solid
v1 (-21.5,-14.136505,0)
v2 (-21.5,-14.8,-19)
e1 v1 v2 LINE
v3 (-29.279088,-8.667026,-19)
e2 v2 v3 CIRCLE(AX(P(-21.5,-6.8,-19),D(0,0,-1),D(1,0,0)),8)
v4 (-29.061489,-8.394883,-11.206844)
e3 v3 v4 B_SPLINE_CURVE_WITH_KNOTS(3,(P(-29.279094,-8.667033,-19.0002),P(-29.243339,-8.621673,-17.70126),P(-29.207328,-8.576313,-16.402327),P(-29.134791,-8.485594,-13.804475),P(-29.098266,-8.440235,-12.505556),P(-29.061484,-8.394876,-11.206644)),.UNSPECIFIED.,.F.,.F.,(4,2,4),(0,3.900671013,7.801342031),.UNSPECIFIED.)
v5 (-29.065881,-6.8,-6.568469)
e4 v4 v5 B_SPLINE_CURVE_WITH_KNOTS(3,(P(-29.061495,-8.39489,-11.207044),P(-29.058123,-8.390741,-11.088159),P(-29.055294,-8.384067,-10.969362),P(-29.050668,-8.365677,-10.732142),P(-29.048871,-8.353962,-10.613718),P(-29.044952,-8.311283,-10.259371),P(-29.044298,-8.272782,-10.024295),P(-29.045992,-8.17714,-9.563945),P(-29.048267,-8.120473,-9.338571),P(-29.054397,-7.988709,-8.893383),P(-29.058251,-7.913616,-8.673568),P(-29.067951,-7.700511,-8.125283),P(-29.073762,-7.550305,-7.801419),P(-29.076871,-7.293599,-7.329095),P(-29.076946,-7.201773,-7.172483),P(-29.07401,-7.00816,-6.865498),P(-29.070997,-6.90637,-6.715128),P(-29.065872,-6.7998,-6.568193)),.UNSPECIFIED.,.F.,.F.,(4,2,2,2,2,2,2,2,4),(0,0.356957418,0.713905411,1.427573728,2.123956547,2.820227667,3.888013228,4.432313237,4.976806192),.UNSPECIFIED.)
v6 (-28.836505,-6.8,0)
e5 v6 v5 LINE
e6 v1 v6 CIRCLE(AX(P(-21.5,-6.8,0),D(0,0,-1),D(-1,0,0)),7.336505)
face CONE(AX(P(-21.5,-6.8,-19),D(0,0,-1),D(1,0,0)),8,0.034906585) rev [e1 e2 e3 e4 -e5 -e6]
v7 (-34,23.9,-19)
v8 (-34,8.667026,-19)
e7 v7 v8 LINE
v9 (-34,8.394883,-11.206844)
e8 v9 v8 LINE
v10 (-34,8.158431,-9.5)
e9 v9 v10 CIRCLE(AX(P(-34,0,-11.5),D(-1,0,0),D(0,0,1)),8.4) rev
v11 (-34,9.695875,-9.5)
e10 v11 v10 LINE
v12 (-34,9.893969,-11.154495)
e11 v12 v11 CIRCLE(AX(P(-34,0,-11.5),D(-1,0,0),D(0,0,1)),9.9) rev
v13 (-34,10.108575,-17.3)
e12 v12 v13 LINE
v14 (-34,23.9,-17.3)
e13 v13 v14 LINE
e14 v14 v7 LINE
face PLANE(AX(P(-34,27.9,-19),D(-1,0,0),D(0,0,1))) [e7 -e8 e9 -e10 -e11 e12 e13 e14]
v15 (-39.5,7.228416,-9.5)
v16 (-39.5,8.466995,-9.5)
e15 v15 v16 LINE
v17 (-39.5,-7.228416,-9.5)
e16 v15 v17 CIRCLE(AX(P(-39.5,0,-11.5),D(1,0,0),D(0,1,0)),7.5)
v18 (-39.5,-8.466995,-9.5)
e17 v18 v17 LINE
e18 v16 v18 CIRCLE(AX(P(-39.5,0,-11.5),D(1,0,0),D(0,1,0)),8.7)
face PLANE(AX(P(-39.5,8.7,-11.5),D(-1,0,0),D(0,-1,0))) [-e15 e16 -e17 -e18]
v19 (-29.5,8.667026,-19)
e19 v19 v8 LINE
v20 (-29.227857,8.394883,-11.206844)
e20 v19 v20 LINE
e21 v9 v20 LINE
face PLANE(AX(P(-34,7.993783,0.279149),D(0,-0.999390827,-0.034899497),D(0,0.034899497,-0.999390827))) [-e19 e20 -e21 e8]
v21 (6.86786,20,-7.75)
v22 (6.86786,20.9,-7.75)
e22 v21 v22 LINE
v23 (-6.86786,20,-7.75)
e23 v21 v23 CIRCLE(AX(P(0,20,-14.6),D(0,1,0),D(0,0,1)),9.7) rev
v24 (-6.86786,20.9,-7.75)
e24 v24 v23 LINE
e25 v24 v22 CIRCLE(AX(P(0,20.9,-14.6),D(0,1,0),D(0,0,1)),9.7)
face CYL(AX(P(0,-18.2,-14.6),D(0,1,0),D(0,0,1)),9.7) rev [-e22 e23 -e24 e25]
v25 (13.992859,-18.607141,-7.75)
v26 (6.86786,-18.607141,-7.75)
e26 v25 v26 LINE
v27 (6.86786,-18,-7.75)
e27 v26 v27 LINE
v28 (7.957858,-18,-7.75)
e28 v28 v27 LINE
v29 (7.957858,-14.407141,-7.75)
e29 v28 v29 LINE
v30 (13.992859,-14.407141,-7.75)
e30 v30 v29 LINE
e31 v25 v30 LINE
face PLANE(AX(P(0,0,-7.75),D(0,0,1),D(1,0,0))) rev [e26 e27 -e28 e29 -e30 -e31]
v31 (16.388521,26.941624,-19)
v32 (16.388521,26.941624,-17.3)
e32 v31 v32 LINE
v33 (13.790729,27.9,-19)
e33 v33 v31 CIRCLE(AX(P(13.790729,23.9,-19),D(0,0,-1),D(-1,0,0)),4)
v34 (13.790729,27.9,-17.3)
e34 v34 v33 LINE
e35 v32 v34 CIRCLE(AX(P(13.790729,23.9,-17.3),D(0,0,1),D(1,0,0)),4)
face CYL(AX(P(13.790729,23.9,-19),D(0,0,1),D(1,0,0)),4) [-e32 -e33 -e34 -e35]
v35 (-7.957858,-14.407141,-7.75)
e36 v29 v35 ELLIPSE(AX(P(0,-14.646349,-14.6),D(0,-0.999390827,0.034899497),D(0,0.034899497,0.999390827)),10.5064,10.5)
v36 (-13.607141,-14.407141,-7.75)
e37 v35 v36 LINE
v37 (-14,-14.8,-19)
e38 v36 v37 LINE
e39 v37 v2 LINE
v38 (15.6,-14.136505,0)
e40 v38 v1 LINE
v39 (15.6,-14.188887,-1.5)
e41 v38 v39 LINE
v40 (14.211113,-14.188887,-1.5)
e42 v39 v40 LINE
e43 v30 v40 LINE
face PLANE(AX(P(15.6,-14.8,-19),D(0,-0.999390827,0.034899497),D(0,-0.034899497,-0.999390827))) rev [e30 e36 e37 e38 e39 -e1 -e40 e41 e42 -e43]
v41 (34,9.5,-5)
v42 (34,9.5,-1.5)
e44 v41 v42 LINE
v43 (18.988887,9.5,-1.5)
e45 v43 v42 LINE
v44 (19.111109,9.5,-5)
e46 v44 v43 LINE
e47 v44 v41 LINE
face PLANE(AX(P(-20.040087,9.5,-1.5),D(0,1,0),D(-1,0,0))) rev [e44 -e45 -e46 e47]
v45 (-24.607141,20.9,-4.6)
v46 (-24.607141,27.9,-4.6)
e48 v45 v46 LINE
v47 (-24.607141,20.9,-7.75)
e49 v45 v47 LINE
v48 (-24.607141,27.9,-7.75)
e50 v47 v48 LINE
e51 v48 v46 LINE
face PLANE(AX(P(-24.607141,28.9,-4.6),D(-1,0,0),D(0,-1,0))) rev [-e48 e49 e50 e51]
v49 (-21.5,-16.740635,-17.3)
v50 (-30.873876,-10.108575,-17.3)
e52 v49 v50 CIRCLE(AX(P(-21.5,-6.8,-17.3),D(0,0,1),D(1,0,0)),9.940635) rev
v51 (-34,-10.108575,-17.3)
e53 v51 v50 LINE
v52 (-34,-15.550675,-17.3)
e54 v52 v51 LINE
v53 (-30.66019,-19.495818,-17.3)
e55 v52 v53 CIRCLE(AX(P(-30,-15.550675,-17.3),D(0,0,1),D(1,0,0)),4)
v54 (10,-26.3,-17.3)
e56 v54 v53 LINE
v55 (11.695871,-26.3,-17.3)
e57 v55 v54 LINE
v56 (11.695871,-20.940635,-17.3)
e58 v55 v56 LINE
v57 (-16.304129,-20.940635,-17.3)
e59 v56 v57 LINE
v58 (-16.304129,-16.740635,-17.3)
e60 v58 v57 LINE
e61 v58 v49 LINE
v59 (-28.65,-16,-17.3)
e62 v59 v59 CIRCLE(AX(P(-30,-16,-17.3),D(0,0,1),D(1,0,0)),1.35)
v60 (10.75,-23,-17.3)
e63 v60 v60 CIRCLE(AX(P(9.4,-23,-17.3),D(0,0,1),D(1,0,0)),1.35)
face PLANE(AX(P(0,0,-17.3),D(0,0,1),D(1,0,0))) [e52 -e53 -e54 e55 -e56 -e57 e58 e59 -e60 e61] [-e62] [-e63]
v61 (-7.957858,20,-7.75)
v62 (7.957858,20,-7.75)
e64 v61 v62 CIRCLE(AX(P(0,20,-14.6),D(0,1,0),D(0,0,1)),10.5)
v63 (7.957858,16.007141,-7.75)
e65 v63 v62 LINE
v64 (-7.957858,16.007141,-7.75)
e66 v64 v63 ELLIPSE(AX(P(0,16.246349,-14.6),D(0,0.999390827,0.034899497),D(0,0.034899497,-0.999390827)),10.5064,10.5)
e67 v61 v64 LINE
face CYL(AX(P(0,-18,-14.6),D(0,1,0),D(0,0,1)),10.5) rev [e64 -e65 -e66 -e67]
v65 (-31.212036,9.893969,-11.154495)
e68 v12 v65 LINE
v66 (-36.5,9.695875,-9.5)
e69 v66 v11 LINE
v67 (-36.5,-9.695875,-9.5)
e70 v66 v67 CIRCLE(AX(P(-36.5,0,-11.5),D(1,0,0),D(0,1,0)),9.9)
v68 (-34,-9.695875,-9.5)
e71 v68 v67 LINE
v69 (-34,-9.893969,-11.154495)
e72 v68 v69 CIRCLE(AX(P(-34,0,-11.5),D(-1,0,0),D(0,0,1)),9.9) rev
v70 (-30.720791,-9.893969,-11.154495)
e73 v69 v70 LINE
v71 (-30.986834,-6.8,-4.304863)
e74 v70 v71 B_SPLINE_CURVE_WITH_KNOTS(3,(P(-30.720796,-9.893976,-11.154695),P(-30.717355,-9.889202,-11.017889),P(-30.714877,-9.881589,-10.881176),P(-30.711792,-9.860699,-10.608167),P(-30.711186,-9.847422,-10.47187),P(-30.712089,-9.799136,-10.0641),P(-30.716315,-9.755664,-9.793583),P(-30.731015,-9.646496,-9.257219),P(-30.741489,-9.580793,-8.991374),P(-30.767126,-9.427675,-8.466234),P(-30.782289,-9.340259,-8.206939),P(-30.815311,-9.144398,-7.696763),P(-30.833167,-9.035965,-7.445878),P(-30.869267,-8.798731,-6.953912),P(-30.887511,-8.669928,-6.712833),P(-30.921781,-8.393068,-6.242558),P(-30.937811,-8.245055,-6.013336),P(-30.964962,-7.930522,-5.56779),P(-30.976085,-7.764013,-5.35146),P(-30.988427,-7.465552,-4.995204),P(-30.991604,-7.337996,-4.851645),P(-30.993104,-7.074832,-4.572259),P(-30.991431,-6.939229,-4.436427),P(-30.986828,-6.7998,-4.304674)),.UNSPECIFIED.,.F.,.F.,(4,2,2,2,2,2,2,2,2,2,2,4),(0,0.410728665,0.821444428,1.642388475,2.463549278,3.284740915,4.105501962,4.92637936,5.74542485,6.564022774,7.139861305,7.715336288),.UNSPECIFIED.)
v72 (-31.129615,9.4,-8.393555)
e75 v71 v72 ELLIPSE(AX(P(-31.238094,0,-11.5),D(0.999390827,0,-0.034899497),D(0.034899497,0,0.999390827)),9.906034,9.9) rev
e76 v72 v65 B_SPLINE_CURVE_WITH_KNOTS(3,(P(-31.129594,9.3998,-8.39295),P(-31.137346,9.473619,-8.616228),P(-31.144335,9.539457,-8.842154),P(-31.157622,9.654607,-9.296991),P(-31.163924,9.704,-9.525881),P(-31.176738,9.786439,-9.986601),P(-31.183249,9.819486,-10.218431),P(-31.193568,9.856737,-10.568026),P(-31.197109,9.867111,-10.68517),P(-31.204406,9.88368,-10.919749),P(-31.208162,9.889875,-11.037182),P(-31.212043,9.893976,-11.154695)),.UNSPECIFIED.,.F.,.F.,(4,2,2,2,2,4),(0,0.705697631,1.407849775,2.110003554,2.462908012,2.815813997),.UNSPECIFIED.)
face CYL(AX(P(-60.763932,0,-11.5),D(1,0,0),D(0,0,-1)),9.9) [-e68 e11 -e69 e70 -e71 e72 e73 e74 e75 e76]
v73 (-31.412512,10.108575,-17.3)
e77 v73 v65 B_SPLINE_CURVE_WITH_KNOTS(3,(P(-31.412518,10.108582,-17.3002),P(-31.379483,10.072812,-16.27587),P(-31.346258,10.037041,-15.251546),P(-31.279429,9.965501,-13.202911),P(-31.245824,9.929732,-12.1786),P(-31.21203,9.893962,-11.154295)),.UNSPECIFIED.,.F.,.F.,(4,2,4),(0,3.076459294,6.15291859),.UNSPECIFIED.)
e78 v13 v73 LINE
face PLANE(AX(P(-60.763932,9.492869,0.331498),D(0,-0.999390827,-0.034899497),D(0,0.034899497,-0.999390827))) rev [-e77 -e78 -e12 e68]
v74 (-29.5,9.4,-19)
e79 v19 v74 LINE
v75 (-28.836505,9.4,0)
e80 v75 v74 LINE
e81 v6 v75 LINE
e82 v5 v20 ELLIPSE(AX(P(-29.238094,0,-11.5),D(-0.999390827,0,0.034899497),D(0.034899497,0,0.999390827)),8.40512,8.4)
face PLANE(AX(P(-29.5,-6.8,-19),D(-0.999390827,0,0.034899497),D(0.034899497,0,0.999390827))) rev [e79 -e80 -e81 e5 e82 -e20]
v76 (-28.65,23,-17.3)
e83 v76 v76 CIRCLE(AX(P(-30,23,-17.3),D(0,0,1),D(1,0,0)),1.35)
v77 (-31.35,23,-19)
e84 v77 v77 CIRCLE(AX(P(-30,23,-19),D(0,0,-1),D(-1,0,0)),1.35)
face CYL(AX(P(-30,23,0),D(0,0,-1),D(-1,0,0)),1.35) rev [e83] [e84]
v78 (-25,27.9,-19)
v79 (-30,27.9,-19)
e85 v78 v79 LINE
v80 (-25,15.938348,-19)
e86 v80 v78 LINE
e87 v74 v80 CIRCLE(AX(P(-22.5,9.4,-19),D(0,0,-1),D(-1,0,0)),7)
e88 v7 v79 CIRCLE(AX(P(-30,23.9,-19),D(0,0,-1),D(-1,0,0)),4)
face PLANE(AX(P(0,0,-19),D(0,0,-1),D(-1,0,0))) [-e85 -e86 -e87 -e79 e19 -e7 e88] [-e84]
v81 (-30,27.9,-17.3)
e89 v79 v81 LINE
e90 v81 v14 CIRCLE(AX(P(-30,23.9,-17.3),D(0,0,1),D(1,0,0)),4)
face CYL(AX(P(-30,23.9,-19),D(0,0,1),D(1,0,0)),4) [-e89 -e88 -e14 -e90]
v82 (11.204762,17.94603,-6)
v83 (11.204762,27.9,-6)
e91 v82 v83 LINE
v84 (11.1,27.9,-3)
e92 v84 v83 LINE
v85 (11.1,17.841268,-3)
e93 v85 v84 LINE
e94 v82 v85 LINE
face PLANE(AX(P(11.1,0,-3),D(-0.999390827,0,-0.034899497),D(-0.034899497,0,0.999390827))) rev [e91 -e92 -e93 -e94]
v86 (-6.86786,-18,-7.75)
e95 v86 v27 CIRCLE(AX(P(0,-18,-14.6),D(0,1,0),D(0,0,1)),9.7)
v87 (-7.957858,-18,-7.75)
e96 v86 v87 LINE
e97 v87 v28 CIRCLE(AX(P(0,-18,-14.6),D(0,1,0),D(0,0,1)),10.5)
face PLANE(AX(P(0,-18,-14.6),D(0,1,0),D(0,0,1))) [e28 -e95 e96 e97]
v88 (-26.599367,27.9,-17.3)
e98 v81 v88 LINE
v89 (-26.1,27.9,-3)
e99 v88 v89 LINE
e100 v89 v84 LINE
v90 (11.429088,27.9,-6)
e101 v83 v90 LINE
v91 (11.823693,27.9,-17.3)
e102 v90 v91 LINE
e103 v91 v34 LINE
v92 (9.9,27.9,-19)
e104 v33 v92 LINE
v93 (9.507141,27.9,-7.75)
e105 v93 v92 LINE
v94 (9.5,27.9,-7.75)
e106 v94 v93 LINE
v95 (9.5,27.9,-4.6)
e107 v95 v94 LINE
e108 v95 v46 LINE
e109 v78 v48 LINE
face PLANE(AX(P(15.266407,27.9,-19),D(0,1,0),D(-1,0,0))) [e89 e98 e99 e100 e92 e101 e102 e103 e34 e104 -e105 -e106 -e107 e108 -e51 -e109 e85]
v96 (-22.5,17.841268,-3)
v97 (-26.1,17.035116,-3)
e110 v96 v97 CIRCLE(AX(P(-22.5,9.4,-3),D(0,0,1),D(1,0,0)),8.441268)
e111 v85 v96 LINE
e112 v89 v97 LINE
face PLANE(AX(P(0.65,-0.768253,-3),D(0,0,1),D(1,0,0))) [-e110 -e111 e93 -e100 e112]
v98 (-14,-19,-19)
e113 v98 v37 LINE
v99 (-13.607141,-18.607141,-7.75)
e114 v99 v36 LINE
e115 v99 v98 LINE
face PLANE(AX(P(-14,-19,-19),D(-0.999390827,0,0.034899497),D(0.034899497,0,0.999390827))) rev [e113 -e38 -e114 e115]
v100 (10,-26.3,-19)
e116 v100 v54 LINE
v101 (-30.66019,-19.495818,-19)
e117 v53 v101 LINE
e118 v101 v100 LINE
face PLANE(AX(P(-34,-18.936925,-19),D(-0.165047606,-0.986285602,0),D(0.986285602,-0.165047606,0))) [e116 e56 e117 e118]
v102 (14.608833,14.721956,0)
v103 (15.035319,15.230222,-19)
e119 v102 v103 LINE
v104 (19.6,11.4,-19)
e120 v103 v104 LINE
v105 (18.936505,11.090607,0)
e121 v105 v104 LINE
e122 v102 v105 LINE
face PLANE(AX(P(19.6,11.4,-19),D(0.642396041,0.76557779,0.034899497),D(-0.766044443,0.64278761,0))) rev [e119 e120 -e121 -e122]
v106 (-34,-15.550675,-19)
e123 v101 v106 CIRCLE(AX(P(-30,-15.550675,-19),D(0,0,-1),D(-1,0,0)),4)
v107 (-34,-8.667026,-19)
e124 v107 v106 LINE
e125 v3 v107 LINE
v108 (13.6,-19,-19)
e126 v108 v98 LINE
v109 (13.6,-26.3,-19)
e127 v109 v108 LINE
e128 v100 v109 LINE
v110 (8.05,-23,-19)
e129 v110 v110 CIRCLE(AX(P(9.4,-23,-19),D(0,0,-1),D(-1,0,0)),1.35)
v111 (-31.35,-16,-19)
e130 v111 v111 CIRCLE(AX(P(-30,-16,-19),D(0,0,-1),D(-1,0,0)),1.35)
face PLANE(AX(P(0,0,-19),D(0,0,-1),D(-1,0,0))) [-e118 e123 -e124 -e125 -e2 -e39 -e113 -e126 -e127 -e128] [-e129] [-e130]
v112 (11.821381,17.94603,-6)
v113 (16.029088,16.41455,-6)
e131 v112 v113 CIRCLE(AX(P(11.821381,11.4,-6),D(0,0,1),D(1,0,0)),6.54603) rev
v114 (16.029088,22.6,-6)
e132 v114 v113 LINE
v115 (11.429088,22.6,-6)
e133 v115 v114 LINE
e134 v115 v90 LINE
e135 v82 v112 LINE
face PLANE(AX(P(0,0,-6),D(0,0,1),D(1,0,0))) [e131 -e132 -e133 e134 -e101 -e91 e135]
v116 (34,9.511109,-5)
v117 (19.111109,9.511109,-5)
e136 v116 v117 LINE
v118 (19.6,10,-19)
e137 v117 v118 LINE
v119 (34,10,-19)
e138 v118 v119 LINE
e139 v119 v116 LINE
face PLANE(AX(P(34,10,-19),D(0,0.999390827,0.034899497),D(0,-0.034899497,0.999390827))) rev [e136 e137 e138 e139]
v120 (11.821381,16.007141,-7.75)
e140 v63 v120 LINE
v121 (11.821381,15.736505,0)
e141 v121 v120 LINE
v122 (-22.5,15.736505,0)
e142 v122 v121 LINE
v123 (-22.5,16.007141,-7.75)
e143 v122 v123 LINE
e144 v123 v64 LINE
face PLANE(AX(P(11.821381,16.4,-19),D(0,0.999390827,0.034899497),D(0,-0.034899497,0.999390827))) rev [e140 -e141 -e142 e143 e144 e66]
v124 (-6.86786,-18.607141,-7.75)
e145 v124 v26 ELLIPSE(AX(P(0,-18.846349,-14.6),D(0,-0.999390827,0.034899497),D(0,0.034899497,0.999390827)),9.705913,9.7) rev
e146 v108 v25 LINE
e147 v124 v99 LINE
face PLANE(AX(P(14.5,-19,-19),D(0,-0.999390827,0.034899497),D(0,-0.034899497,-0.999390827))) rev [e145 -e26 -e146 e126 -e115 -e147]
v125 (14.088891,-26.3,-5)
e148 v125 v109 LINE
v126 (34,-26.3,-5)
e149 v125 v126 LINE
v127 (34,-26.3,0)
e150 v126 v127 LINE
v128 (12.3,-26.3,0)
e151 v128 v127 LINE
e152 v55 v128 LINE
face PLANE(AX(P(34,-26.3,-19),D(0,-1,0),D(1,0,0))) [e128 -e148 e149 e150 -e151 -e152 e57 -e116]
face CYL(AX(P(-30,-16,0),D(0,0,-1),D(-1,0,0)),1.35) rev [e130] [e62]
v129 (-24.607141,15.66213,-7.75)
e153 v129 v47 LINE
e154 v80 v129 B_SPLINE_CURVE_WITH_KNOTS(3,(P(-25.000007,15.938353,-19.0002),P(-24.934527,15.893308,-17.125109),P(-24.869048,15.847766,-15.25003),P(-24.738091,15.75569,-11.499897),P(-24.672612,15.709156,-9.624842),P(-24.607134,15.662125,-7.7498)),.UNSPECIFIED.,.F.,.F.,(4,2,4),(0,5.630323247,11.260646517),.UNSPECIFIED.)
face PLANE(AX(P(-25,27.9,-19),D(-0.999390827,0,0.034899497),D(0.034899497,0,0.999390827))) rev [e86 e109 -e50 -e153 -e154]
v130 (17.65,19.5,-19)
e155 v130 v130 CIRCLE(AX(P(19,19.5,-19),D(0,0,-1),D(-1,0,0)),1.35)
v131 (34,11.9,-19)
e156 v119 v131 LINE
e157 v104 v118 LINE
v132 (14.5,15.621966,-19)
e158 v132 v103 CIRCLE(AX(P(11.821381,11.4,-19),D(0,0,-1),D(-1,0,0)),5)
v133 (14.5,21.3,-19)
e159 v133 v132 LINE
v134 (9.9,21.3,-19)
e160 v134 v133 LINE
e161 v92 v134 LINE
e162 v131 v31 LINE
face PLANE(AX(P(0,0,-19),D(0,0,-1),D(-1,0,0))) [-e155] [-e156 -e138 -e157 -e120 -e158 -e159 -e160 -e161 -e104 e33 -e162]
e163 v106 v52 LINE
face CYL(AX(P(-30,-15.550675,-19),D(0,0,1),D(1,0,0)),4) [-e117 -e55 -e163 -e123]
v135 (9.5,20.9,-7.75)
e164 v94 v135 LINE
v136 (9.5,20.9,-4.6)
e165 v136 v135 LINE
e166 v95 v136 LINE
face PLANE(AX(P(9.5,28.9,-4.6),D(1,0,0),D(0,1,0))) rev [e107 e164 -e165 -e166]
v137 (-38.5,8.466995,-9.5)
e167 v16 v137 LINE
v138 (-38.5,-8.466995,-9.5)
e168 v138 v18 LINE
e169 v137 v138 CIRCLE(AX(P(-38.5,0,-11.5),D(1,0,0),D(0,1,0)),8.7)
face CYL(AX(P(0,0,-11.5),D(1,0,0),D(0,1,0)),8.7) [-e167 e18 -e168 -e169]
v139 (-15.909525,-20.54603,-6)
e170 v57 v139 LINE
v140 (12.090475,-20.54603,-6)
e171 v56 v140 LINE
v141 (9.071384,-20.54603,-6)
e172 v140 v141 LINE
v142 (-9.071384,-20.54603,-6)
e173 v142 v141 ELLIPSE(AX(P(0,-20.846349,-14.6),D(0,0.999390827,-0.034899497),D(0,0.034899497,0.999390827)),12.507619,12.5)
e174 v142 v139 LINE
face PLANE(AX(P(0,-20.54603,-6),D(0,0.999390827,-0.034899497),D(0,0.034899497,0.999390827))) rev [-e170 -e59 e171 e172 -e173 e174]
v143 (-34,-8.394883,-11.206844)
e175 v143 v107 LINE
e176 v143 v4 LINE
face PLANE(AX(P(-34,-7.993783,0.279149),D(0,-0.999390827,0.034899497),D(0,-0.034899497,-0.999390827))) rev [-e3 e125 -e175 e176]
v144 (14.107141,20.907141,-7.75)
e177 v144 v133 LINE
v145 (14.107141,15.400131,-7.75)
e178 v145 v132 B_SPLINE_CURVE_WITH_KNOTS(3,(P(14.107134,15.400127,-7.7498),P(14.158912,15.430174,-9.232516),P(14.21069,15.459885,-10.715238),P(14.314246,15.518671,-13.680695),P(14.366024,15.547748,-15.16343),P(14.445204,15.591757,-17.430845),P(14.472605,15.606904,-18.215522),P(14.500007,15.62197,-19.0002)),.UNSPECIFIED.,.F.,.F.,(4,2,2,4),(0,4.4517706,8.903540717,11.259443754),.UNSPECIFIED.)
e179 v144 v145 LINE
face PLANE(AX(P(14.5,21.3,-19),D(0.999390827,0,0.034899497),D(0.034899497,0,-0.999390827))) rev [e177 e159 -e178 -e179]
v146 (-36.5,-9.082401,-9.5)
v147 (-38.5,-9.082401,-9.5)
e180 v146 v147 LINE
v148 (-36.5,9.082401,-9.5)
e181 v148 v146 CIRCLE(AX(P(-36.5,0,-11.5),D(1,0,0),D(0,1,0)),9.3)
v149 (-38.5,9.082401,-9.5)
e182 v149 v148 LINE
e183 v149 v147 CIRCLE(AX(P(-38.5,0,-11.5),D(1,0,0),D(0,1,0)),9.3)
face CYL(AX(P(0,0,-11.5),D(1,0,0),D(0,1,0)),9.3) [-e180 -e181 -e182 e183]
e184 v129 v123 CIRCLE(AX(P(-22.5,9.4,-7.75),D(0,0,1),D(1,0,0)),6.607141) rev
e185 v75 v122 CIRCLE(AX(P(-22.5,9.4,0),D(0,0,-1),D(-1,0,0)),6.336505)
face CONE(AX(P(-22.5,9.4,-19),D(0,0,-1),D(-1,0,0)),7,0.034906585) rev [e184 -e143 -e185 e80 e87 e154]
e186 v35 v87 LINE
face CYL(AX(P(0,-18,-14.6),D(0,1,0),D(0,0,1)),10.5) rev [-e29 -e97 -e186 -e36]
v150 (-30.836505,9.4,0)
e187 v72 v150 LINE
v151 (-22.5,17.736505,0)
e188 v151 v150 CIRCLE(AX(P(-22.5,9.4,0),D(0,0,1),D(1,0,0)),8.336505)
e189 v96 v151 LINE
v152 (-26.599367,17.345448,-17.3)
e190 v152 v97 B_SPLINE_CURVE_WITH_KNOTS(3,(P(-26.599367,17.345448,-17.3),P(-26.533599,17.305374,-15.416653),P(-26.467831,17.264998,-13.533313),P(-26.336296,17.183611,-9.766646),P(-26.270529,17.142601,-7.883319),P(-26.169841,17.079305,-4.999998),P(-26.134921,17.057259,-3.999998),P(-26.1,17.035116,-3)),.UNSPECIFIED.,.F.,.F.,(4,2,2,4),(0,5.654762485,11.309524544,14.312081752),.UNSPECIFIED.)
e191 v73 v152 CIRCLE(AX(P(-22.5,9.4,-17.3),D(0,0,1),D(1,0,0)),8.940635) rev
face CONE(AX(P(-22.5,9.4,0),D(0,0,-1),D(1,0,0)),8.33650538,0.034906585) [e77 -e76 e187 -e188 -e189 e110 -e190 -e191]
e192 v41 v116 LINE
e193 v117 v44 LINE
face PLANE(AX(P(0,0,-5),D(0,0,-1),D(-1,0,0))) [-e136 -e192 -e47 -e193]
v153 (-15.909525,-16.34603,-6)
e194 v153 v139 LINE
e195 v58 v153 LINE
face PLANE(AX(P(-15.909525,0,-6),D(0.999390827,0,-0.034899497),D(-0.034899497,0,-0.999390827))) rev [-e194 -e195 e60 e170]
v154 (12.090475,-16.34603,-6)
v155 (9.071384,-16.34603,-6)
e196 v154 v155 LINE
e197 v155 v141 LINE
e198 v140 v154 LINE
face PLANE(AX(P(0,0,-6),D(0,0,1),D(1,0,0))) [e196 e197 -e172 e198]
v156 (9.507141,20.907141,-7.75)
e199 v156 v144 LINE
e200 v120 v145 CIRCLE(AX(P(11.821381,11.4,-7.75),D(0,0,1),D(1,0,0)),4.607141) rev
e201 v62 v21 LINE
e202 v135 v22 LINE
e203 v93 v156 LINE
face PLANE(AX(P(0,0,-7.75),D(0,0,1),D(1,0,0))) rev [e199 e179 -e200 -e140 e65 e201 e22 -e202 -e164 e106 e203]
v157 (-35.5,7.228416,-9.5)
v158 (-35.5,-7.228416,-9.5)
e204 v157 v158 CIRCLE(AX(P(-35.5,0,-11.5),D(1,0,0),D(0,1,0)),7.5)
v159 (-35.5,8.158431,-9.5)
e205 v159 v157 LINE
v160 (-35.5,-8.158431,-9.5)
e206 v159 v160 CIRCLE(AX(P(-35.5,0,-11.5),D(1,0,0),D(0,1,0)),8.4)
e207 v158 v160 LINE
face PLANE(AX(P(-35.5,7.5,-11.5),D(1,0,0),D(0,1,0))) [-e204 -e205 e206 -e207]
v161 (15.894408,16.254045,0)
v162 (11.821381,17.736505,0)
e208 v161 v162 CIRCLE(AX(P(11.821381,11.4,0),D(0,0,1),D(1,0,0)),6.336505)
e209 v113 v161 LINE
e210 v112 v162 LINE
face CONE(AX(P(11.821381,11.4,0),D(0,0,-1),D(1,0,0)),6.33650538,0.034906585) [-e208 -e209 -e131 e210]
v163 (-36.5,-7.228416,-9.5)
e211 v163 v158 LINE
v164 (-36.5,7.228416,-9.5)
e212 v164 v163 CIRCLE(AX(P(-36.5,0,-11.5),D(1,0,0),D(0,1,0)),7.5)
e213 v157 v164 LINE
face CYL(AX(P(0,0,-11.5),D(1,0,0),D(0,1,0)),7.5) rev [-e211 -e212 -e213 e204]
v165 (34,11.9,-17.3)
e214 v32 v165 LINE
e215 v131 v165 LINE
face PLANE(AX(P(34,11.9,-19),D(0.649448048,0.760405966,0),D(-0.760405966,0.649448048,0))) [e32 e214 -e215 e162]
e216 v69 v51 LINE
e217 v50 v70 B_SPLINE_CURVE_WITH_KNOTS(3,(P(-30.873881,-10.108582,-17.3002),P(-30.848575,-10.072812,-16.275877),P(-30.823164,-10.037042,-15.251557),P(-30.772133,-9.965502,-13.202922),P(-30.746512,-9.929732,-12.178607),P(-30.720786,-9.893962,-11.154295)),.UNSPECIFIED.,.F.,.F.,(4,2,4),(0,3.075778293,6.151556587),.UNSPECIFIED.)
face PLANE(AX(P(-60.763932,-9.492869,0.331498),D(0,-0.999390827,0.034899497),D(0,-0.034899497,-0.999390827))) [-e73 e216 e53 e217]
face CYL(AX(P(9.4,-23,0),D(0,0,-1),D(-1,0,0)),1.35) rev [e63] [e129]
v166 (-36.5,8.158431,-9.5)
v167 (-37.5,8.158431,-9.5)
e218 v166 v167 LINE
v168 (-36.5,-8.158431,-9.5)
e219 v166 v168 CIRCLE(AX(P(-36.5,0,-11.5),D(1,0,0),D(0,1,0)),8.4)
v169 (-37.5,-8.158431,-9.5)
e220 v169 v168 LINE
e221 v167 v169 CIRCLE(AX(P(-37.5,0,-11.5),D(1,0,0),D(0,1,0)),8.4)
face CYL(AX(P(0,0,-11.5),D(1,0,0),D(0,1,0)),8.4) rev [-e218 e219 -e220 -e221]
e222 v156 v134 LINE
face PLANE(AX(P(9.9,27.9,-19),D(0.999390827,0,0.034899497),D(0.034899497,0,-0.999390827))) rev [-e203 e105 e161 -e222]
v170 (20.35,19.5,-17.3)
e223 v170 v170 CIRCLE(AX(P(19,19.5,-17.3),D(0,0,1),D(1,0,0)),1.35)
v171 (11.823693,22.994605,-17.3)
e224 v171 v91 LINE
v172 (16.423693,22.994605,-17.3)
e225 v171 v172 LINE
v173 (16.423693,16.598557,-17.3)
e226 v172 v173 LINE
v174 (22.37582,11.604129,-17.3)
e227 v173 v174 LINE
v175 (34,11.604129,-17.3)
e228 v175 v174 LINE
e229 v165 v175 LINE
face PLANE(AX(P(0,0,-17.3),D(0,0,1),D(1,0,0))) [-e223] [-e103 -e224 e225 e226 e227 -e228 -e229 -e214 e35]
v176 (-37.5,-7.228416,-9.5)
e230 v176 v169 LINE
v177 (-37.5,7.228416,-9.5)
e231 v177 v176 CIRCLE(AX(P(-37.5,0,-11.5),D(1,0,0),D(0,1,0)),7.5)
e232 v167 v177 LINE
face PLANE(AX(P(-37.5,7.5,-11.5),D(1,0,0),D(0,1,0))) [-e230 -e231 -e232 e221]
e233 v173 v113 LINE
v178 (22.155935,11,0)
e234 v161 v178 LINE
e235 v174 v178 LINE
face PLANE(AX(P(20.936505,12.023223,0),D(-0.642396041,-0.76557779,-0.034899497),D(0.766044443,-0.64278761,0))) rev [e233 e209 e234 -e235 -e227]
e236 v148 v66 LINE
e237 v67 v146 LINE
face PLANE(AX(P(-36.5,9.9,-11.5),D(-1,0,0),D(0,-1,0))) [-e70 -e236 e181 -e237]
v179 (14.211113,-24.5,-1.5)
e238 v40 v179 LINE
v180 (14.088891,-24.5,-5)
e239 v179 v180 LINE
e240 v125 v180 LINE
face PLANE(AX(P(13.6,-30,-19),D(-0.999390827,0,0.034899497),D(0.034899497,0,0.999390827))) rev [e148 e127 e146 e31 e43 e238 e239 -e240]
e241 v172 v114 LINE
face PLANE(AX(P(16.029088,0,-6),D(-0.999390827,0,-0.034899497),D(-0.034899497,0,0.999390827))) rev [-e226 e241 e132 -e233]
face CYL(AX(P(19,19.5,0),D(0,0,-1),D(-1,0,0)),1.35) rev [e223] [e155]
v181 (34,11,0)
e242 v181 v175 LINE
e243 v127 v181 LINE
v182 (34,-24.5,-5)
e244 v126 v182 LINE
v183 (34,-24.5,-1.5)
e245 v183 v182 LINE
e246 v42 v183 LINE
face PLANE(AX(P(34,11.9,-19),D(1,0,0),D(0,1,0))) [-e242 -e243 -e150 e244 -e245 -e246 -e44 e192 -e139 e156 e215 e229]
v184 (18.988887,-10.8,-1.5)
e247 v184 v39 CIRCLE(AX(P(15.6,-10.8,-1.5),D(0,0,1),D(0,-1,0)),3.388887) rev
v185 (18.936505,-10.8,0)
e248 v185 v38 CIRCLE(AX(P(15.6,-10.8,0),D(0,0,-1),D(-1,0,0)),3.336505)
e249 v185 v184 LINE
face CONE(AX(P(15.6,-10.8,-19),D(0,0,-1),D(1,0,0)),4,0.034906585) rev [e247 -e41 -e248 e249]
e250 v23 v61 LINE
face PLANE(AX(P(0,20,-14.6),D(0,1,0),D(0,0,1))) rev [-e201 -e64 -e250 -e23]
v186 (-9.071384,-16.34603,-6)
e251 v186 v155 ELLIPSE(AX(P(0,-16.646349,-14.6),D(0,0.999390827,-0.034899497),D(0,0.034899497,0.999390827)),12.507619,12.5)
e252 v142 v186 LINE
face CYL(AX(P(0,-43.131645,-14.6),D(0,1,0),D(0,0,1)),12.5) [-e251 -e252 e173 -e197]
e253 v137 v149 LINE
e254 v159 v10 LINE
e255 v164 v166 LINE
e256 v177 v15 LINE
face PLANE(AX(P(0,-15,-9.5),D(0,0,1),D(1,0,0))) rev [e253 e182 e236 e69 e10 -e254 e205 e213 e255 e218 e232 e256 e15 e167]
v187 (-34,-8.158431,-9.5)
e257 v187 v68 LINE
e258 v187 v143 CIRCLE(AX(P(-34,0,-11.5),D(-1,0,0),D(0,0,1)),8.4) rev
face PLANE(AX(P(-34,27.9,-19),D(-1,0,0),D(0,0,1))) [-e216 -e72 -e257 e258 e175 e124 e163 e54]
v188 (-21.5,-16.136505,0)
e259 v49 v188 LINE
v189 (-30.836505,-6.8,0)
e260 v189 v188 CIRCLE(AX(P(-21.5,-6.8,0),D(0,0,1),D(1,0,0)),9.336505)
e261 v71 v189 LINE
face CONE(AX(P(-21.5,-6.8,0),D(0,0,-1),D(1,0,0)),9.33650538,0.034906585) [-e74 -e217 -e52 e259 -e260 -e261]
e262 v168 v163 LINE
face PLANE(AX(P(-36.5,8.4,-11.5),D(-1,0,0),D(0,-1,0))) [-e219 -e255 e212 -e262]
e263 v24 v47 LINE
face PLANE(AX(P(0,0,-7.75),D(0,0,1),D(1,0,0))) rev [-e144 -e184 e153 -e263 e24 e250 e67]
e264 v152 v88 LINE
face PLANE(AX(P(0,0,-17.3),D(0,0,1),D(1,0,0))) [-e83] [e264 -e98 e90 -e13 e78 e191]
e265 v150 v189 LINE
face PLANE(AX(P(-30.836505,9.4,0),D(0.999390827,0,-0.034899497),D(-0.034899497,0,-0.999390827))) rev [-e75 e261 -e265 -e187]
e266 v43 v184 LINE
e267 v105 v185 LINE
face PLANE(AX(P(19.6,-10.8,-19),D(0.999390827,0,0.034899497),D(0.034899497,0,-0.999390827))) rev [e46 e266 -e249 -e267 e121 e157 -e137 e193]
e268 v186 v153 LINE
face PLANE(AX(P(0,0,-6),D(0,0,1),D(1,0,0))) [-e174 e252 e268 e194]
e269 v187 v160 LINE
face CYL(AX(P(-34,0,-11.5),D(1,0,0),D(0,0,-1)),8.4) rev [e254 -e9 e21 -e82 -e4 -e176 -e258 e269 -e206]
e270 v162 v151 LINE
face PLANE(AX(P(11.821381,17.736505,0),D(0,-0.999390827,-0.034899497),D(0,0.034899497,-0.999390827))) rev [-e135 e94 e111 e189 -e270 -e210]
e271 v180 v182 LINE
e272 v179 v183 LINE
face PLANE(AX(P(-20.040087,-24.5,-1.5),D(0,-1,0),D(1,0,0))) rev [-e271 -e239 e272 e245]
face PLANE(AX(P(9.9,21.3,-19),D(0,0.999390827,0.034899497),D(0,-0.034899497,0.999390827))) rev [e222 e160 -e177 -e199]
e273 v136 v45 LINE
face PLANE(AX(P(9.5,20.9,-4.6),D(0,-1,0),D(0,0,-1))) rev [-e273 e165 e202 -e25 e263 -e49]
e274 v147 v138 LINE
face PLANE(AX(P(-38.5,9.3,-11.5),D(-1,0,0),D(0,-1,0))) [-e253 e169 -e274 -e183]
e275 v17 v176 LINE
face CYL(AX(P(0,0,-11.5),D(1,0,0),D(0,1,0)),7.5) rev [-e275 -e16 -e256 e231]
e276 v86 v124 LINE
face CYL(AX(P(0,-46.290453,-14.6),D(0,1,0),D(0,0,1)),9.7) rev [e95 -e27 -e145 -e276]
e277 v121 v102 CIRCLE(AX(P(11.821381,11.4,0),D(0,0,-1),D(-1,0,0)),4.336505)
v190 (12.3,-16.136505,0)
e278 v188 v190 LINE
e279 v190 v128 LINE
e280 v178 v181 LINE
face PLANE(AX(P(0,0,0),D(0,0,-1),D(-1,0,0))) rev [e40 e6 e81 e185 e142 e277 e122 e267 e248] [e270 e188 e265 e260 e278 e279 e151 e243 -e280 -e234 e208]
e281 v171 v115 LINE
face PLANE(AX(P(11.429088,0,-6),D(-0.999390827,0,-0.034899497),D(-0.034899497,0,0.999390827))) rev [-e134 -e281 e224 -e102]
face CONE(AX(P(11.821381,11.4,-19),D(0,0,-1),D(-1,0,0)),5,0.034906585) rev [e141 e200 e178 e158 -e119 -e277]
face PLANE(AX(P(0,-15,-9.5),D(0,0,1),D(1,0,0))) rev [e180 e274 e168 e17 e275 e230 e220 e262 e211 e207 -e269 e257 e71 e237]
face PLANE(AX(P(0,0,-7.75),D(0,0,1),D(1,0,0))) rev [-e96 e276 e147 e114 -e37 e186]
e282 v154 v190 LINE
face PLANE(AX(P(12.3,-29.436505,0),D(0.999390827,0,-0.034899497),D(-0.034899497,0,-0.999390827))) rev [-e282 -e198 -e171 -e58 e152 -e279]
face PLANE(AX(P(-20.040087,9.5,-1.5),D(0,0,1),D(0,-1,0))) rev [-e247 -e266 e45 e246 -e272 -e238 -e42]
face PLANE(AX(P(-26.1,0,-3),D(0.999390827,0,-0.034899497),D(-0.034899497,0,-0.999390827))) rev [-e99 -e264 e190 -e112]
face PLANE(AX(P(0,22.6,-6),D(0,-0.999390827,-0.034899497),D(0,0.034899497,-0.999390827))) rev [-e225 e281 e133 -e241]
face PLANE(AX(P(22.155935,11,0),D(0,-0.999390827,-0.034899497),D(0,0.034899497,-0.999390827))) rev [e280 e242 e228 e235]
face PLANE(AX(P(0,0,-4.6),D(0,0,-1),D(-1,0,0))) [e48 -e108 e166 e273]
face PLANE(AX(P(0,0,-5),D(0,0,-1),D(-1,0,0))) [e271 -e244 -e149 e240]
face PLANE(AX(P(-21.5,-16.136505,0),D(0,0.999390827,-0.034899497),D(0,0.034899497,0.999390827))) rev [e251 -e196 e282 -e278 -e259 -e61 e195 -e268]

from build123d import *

# Parameters (mm, degrees)
EXTRUDE_1_DEPTH       = 19
CUT_EXTRUDE_1_DEPTH   = 14
CUT_EXTRUDE_1_DRAFT   = -2
CUT_EXTRUDE_2_DEPTH   = 48.910437276
CUT_EXTRUDE_2_DRAFT   = -2
CUT_EXTRUDE_START     = -24.5
CUT_EXTRUDE_3_DEPTH   = 34
CUT_EXTRUDE_4_DEPTH   = 11.25
CUT_EXTRUDE_4_DRAFT   = -2
SKETCH_8_W            = 34.107141343
SKETCH_8_H            = 8
CUT_EXTRUDE_5_DEPTH   = 3.15
SKETCH_13_OUTSIDE_W   = 88.012
SKETCH_13_OUTSIDE_H   = 74.212
CUT_EXTRUDE_9_DEPTH   = 3
CUT_EXTRUDE_9_DRAFT   = -2
CUT_EXTRUDE_10_DEPTH  = 3
CUT_EXTRUDE_10_DRAFT  = -2
CUT_EXTRUDE_11_DEPTH  = 11.3
CUT_EXTRUDE_11_DRAFT  = -2
CUT_EXTRUDE_12_DEPTH  = 3
CUT_EXTRUDE_12_DRAFT  = -2
CUT_EXTRUDE_14_DEPTH  = 11.3
CUT_EXTRUDE_14_DRAFT  = -2
SKETCH_11_R           = 9.7
CUT_EXTRUDE_7_DEPTH   = 39.1
EXTRUDE_START         = -7.432804617
EXTRUDE_4_DEPTH       = 16.504188194
EXTRUDE_START_2       = -20.546029997
EXTRUDE_4_2_DEPTH     = 6.138888654
EXTRUDE_START_3       = -14.8
EXTRUDE_4_3_DEPTH     = 0.462628259
EXTRUDE_START_4       = -14.407141343
EXTRUDE_4_4_DEPTH     = 0.099524193
EXTRUDE_START_5       = -21
EXTRUDE_4_5_OUTLINE_W = 22
EXTRUDE_4_5_OUTLINE_H = 9
EXTRUDE_4_5_DEPTH     = 0.67588307
EXTRUDE_START_6       = -14.127893803
EXTRUDE_4_6_OUTLINE_W = 22
EXTRUDE_4_6_OUTLINE_H = 9
EXTRUDE_4_6_DEPTH     = 1.127893803
CUT_EXTRUDE_START_2   = -0.9
SKETCH_12_R           = 10.5
CUT_EXTRUDE_8_DEPTH   = 38
CUT_EXTRUDE_6_DEPTH   = 48.910437276
EXTRUDE_START_7       = -30
EXTRUDE_2_DEPTH       = 4
CUT_EXTRUDE_START_3   = -5.5
SKETCH_25_W           = 16
SKETCH_25_H           = 30
CUT_EXTRUDE_17_DEPTH  = 5.5
FILLET_1_R            = 4
SKETCH_26_R           = 1.35
CUT_EXTRUDE_18_DEPTH  = 52.958252509
CUT_EXTRUDE_19_REACH  = 65.467
SKETCH_28_R           = 9.7


with BuildPart() as part:
    # 草图1 → 凸台-拉伸1 (new body)
    with BuildSketch(Plane.XY):
        Polygon((34, 11.9), (15.266406942, 27.9), (-34, 27.9), (-34, -18.9369252), (10, -26.3), (34, -26.3), align=None)
    extrude(amount=-EXTRUDE_1_DEPTH)


with BuildPart() as cut_extrude_1_tool:
    # 草图2 → 切除-拉伸1 (with draft: the straight prism first)
    with BuildSketch(Plane(origin=(0, 0, -19), x_dir=(-1, 0, 0), z_dir=(0, 0, -1))):
        Polygon((-34, 10), (-37.6, 10), (-37.6, -30), (-13.6, -30), (-13.6, -26.3), (-13.6, 10), align=None)
    extrude(amount=-CUT_EXTRUDE_1_DEPTH)
    # 切除-拉伸1: the draft: its side faces are tilted about the plane it starts from
    cut_extrude_1_sides = [cut_extrude_1_tool.faces().sort_by_distance(p)[0] for p in [
        (25.6, 10, -12),
        (25.6, -30, -12),
        (13.6, -10, -12),
        (37.6, -10, -12),
    ]]
    draft(cut_extrude_1_sides, Plane(origin=(0, 0, -19), x_dir=(-1, 0, 0), z_dir=(0, 0, -1)), CUT_EXTRUDE_1_DRAFT)


with BuildPart() as part_1:
    add(part.part)

    # 切除-拉伸1: cut by cut_extrude_1_tool
    add(cut_extrude_1_tool.part, mode=Mode.SUBTRACT)


with BuildPart() as cut_extrude_2_tool:
    # 草图3 → 切除-拉伸2 (with draft: the straight prism first)
    with BuildSketch(Plane(origin=(0, 0, -19), x_dir=(-1, 0, 0), z_dir=(0, 0, -1))):
        with BuildLine():
            Line((-19.6, 11.4), (-19.6, -10.8))
            ThreePointArc((-19.6, -10.8), (-18.428427125, -13.628427125), (-15.6, -14.8))
            Line((-15.6, -14.8), (21.5, -14.8))
            ThreePointArc((21.5, -14.8), (27.156854249, -12.456854249), (29.5, -6.8))
            Line((29.5, -6.8), (29.5, 9.4))
            ThreePointArc((29.5, 9.4), (27.449747468, 14.349747468), (22.5, 16.4))
            Line((22.5, 16.4), (-11.821380866, 16.4))
            ThreePointArc((-11.821380866, 16.4), (-13.531481582, 16.098463104), (-15.035318914, 15.230222216))
            Line((-15.035318914, 15.230222216), (-19.6, 11.4))
        make_face()
    extrude(amount=-CUT_EXTRUDE_2_DEPTH)
    # 切除-拉伸2: the draft: its side faces are tilted about the plane it starts from
    cut_extrude_2_sides = [cut_extrude_2_tool.faces().sort_by_distance(p)[0] for p in [
        (19.6, 0.3, 5.455218638),
        (18.428427125, -13.628427125, 5.455218638),
        (-2.95, -14.8, 5.455218638),
        (-27.156854249, -12.456854249, 5.455218638),
        (-29.5, 1.3, 5.455218638),
        (-27.449747468, 14.349747468, 5.455218638),
        (-5.339309567, 16.4, 5.455218638),
        (13.531481582, 16.098463104, 5.455218638),
        (17.317659457, 13.315111108, 5.455218638),
    ]]
    draft(cut_extrude_2_sides, Plane(origin=(0, 0, -19), x_dir=(-1, 0, 0), z_dir=(0, 0, -1)), CUT_EXTRUDE_2_DRAFT)


with BuildPart() as part_2:
    add(part_1.part)

    # 切除-拉伸2: cut by cut_extrude_2_tool
    add(cut_extrude_2_tool.part, mode=Mode.SUBTRACT)

    # 切除-拉伸3: read off the stored shape, not the designer's step
    # 切除-拉伸3 outline → 切除-拉伸3 (cut)
    with BuildSketch(Plane(origin=(0, 0, 0), x_dir=(1, 0, 0), z_dir=(0, 1, 0)).offset(CUT_EXTRUDE_START)):
        Polygon((14.088890773, 5), (14.211113466, 1.5), (34, 1.5), (34, 5), align=None)
    extrude(amount=CUT_EXTRUDE_3_DEPTH, mode=Mode.SUBTRACT)


with BuildPart() as cut_extrude_4_tool:
    # 草图5 → 切除-拉伸4 (with draft: the straight prism first)
    with BuildSketch(Plane(origin=(0, 0, -19), x_dir=(-1, 0, 0), z_dir=(0, 0, -1))):
        Polygon((-9.9, 27.9), (-9.9, 21.3), (-14.5, 21.3), (-14.5, -19), (14, -19), (14, 5), (25, 5), (25, 27.9), (25, 32.9), (-9.9, 32.9), align=None)
    extrude(amount=-CUT_EXTRUDE_4_DEPTH)
    # 切除-拉伸4: the draft: its side faces are tilted about the plane it starts from
    cut_extrude_4_sides = [cut_extrude_4_tool.faces().sort_by_distance(p)[0] for p in [
        (9.9, 27.1, -13.375),
        (-25, 18.95, -13.375),
        (-19.5, 5, -13.375),
        (-14, -7, -13.375),
        (0.25, -19, -13.375),
        (14.5, 1.15, -13.375),
        (-7.55, 32.9, -13.375),
        (12.2, 21.3, -13.375),
    ]]
    draft(cut_extrude_4_sides, Plane(origin=(0, 0, -19), x_dir=(-1, 0, 0), z_dir=(0, 0, -1)), CUT_EXTRUDE_4_DRAFT)


with BuildPart() as part_3:
    add(part_2.part)

    # 切除-拉伸4: cut by cut_extrude_4_tool
    add(cut_extrude_4_tool.part, mode=Mode.SUBTRACT)

    # 草图8 → 切除-拉伸5 (cut)
    with BuildSketch(Plane(origin=(0, 0, -7.75), x_dir=(-1, 0, 0), z_dir=(0, 0, -1))):
        with Locations((7.553570672, 24.9)):
            Rectangle(SKETCH_8_W, SKETCH_8_H)
    extrude(amount=-CUT_EXTRUDE_5_DEPTH, mode=Mode.SUBTRACT)


with BuildPart() as cut_extrude_9_tool:
    # 草图13 outside → 切除-拉伸9 (with draft: the straight prism first)
    with BuildSketch(Plane.XY):
        with Locations((0, 0.8)):
            Rectangle(SKETCH_13_OUTSIDE_W, SKETCH_13_OUTSIDE_H)
        with BuildLine():
            Line((20.93650538, 12.023222694), (15.894408012, 16.254044735))
            ThreePointArc((15.894408012, 16.254044735), (13.988593344, 17.354367347), (11.821380866, 17.73650538))
            Line((11.821380866, 17.73650538), (-22.5, 17.73650538))
            ThreePointArc((-22.5, 17.73650538), (-28.394799485, 15.294799485), (-30.83650538, 9.4))
            Line((-30.83650538, 9.4), (-30.83650538, -6.8))
            ThreePointArc((-30.83650538, -6.8), (-28.101906267, -13.401906267), (-21.5, -16.13650538))
            Line((-21.5, -16.13650538), (12.3, -16.13650538))
            Line((12.3, -16.13650538), (12.3, -29.43650538))
            Line((12.3, -29.43650538), (35.3, -29.43650538))
            Line((35.3, -29.43650538), (35.3, 11))
            Line((35.3, 11), (22.155934701, 11))
            Line((22.155934701, 11), (20.93650538, 12.023222694))
        make_face(mode=Mode.SUBTRACT)
    extrude(amount=-CUT_EXTRUDE_9_DEPTH)
    # 切除-拉伸9: the draft: its side faces are tilted about the plane it starts from
    cut_extrude_9_sides = [cut_extrude_9_tool.faces().sort_by_distance(p)[0] for p in [
        (0, -36.306, -1.5),
        (19.025171357, 13.627022367, -1.5),
        (13.988593344, 17.354367347, -1.5),
        (-5.339309567, 17.73650538, -1.5),
        (-28.394799485, 15.294799485, -1.5),
        (-30.83650538, 1.3, -1.5),
        (-28.101906267, -13.401906267, -1.5),
        (-4.6, -16.13650538, -1.5),
        (12.3, -22.78650538, -1.5),
        (23.8, -29.43650538, -1.5),
        (35.3, -9.21825269, -1.5),
        (28.72796735, 11, -1.5),
        (0, 37.906, -1.5),
        (44.006, 0.8, -1.5),
        (-44.006, 0.8, -1.5),
    ]]
    draft(cut_extrude_9_sides, Plane.XY, CUT_EXTRUDE_9_DRAFT)


with BuildPart() as part_4:
    add(part_3.part)

    # 切除-拉伸9: cut by cut_extrude_9_tool
    add(cut_extrude_9_tool.part, mode=Mode.SUBTRACT)


with BuildPart() as cut_extrude_10_tool:
    # 切除-拉伸10: read off the stored shape, not the designer's step
    # 切除-拉伸10 outline → 切除-拉伸10 (with draft: the straight prism first)
    with BuildSketch(Plane.XY.offset(-6)):
        with BuildLine():
            Line((11.204762308, 27.9), (11.204762308, 17.946029997))
            Line((11.204762308, 17.946029997), (11.821380866, 17.946029997))
            ThreePointArc((11.821380866, 17.946029997), (14.060254983, 17.551256083), (16.02908784, 16.414549903))
            Line((16.02908784, 16.414549903), (22.232195425, 11.209524617))
            Line((22.232195425, 11.209524617), (34, 11.209524617))
            Line((34, 11.209524617), (34, 11.9))
            Line((34, 11.9), (15.266406942, 27.9))
            Line((15.266406942, 27.9), (11.204762308, 27.9))
        make_face()
    extrude(amount=CUT_EXTRUDE_10_DEPTH)
    # 切除-拉伸10: the draft: its side faces are tilted about the plane it starts from
    cut_extrude_10_sides = [cut_extrude_10_tool.faces().sort_by_distance(p)[0] for p in [
        (11.204762308, 22.923014999, -4.5),
        (11.513071587, 17.946029997, -4.5),
        (14.060254983, 17.551256083, -4.5),
        (19.130641632, 13.81203726, -4.5),
        (28.116097713, 11.209524617, -4.5),
        (34, 11.554762309, -4.5),
        (24.633203471, 19.9, -4.5),
        (13.235584625, 27.9, -4.5),
    ]]
    draft(cut_extrude_10_sides, Plane.XY.offset(-6), CUT_EXTRUDE_10_DRAFT)


with BuildPart() as part_5:
    add(part_4.part)

    # 切除-拉伸10: cut by cut_extrude_10_tool
    add(cut_extrude_10_tool.part, mode=Mode.SUBTRACT)


with BuildPart() as cut_extrude_11_tool:
    # 草图16 → 切除-拉伸11 (with draft: the straight prism first)
    with BuildSketch(Plane.XY.offset(-6)):
        Polygon((11.42908784, 27.683058999), (11.42908784, 22.6), (16.02908784, 22.6), (16.02908784, 16.414549903), (22.232195425, 11.209524617), (34.344991098, 11.209524617), (39.42908784, 11.209524617), (39.42908784, 31.209524617), (11.42908784, 31.209524617), align=None)
    extrude(amount=-CUT_EXTRUDE_11_DEPTH)
    # 切除-拉伸11: the draft: its side faces are tilted about the plane it starts from
    cut_extrude_11_sides = [cut_extrude_11_tool.faces().sort_by_distance(p)[0] for p in [
        (11.42908784, 26.904762308, -11.65),
        (39.42908784, 21.209524617, -11.65),
        (30.830641632, 11.209524617, -11.65),
        (19.130641632, 13.81203726, -11.65),
        (16.02908784, 19.507274952, -11.65),
        (25.42908784, 31.209524617, -11.65),
        (13.72908784, 22.6, -11.65),
    ]]
    draft(cut_extrude_11_sides, Plane.XY.offset(-6), CUT_EXTRUDE_11_DRAFT)


with BuildPart() as part_6:
    add(part_5.part)

    # 切除-拉伸11: cut by cut_extrude_11_tool
    add(cut_extrude_11_tool.part, mode=Mode.SUBTRACT)


with BuildPart() as cut_extrude_12_tool:
    # 切除-拉伸12: read off the stored shape, not the designer's step
    # 切除-拉伸12 outline → 切除-拉伸12 (with draft: the straight prism first)
    with BuildSketch(Plane.XY.offset(-6)):
        with BuildLine():
            Line((-34, 27.9), (-34, -18.9369252))
            Line((-34, -18.9369252), (10, -26.3))
            Line((10, -26.3), (12.090475383, -26.3))
            Line((12.090475383, -26.3), (12.090475383, -16.346029997))
            Line((12.090475383, -16.346029997), (-21.5, -16.346029997))
            ThreePointArc((-21.5, -16.346029997), (-28.250062544, -13.550062544), (-31.046029997, -6.8))
            Line((-31.046029997, -6.8), (-31.046029997, 9.4))
            ThreePointArc((-31.046029997, 9.4), (-29.735179283, 13.948275436), (-26.204762308, 17.101257361))
            Line((-26.204762308, 17.101257361), (-26.204762308, 27.9))
            Line((-26.204762308, 27.9), (-34, 27.9))
        make_face()
    extrude(amount=CUT_EXTRUDE_12_DEPTH)
    # 切除-拉伸12: the draft: its side faces are tilted about the plane it starts from
    cut_extrude_12_sides = [cut_extrude_12_tool.faces().sort_by_distance(p)[0] for p in [
        (-34, 4.4815374, -4.5),
        (-12, -22.6184626, -4.5),
        (11.045237692, -26.3, -4.5),
        (12.090475383, -21.323014998, -4.5),
        (-4.704762308, -16.346029997, -4.5),
        (-28.250062544, -13.550062544, -4.5),
        (-31.046029997, 1.3, -4.5),
        (-29.735179283, 13.948275436, -4.5),
        (-26.204762308, 22.500628681, -4.5),
        (-30.102381154, 27.9, -4.5),
    ]]
    draft(cut_extrude_12_sides, Plane.XY.offset(-6), CUT_EXTRUDE_12_DRAFT)


with BuildPart() as part_7:
    add(part_6.part)

    # 切除-拉伸12: cut by cut_extrude_12_tool
    add(cut_extrude_12_tool.part, mode=Mode.SUBTRACT)


with BuildPart() as cut_extrude_14_tool:
    # 切除-拉伸14: read off the stored shape, not the designer's step
    # 切除-拉伸14 outline → 切除-拉伸14 (with draft: the straight prism first)
    with BuildSketch(Plane.XY.offset(-17.3)):
        with BuildLine():
            Line((-34, 27.9), (-34, -18.9369252))
            Line((-34, -18.9369252), (10, -26.3))
            Line((10, -26.3), (11.695870688, -26.3))
            Line((11.695870688, -26.3), (11.695870688, -20.940634692))
            Line((11.695870688, -20.940634692), (-16.304129312, -20.940634692))
            Line((-16.304129312, -20.940634692), (-16.304129312, -16.740634692))
            Line((-16.304129312, -16.740634692), (-21.5, -16.740634692))
            ThreePointArc((-21.5, -16.740634692), (-28.5290902, -13.8290902), (-31.440634692, -6.8))
            Line((-31.440634692, -6.8), (-31.440634692, 9.4))
            ThreePointArc((-31.440634692, 9.4), (-30.134981714, 14.052096616), (-26.599367004, 17.345447682))
            Line((-26.599367004, 17.345447682), (-26.599367004, 27.9))
            Line((-26.599367004, 27.9), (-34, 27.9))
        make_face()
    extrude(amount=CUT_EXTRUDE_14_DEPTH)
    # 切除-拉伸14: the draft: its side faces are tilted about the plane it starts from
    cut_extrude_14_sides = [cut_extrude_14_tool.faces().sort_by_distance(p)[0] for p in [
        (-30.134981714, 14.052096616, -11.65),
        (-26.599367004, 22.622723841, -11.65),
        (-30.299683502, 27.9, -11.65),
        (-34, 4.4815374, -11.65),
        (-12, -22.6184626, -11.65),
        (10.847935344, -26.3, -11.65),
        (11.695870688, -23.620317346, -11.65),
        (-2.304129312, -20.940634692, -11.65),
        (-16.304129312, -18.840634692, -11.65),
        (-18.902064656, -16.740634692, -11.65),
        (-28.5290902, -13.8290902, -11.65),
        (-31.440634692, 1.3, -11.65),
    ]]
    draft(cut_extrude_14_sides, Plane.XY.offset(-17.3), CUT_EXTRUDE_14_DRAFT)


with BuildPart() as part_8:
    add(part_7.part)

    # 切除-拉伸14: cut by cut_extrude_14_tool
    add(cut_extrude_14_tool.part, mode=Mode.SUBTRACT)

    # 草图11 → 切除-拉伸7 (cut)
    with BuildSketch(Plane(origin=(0, 20.9, 0), x_dir=(1, 0, 0), z_dir=(0, 1, 0))):
        with Locations((0, 14.6)):
            Circle(SKETCH_11_R)
    extrude(amount=-CUT_EXTRUDE_7_DEPTH, mode=Mode.SUBTRACT)

    # 凸台-拉伸4: read off the stored shape, not the designer's step
    # 凸台-拉伸4 outline → 凸台-拉伸4 (add)
    with BuildSketch(Plane.YZ.offset(EXTRUDE_START)):
        Polygon((-18.2, -7.75), (-16.407141343, -7.75), (-16.346029997, -6), (-18.2, -6), align=None)
    extrude(amount=EXTRUDE_4_DEPTH)

    # Extrude 4 2 outline → Extrude 4 2 (add)
    with BuildSketch(Plane(origin=(0, 0, 0), x_dir=(1, 0, 0), z_dir=(0, 1, 0)).offset(EXTRUDE_START_2)):
        with BuildLine():
            Line((6.867859929, 7.75), (-6.867859929, 7.75))
            ThreePointArc((-6.867859929, 7.75), (-5.744286821, 6.783788071), (-4.486646855, 6))
            Line((-4.486646855, 6), (-9.071383577, 6))
            ThreePointArc((-9.071383577, 6), (0, 2.1), (9.071383577, 6))
            Line((9.071383577, 6), (4.486646855, 6))
            ThreePointArc((4.486646855, 6), (5.744286821, 6.783788071), (6.867859929, 7.75))
        make_face()
    extrude(amount=EXTRUDE_4_2_DEPTH)

    # Extrude 4 3 outline → Extrude 4 3 (add)
    with BuildSketch(Plane(origin=(0, 0, 0), x_dir=(1, 0, 0), z_dir=(0, 1, 0)).offset(EXTRUDE_START_3)):
        with BuildLine():
            Line((6.867859929, 7.75), (-6.867859929, 7.75))
            ThreePointArc((-6.867859929, 7.75), (0, 4.9), (6.867859929, 7.75))
        make_face()
    extrude(amount=EXTRUDE_4_3_DEPTH)

    # Extrude 4 4 outline → Extrude 4 4 (add)
    with BuildSketch(Plane(origin=(0, 0, 0), x_dir=(1, 0, 0), z_dir=(0, 1, 0)).offset(EXTRUDE_START_4)):
        with BuildLine():
            Line((4.486646855, 6), (-4.486646855, 6))
            ThreePointArc((-4.486646855, 6), (0, 4.9), (4.486646855, 6))
        make_face()
    extrude(amount=EXTRUDE_4_4_DEPTH)

    # Extrude 4 5 outline → Extrude 4 5 (cut)
    with BuildSketch(Plane(origin=(0, 0, 0), x_dir=(1, 0, 0), z_dir=(0, 0.9993908270190958, -0.03489949670250099)).offset(EXTRUDE_START_5)):
        with Locations((0, 5.5)):
            Rectangle(EXTRUDE_4_5_OUTLINE_W, EXTRUDE_4_5_OUTLINE_H)
    extrude(amount=EXTRUDE_4_5_DEPTH, mode=Mode.SUBTRACT)

    # Extrude 4 6 outline → Extrude 4 6 (cut)
    with BuildSketch(Plane(origin=(0, 0, 0), x_dir=(1, 0, 0), z_dir=(0, 0.9993908270190958, -0.03489949670250099)).offset(EXTRUDE_START_6)):
        with Locations((0, 5.5)):
            Rectangle(EXTRUDE_4_6_OUTLINE_W, EXTRUDE_4_6_OUTLINE_H)
    extrude(amount=EXTRUDE_4_6_DEPTH, mode=Mode.SUBTRACT)

    # 草图12 → 切除-拉伸8 (cut)
    with BuildSketch(Plane(origin=(0, 20.9, 0), x_dir=(1, 0, 0), z_dir=(0, 1, 0)).offset(CUT_EXTRUDE_START_2)):
        with Locations((0, 14.6)):
            Circle(SKETCH_12_R)
    extrude(amount=-CUT_EXTRUDE_8_DEPTH, mode=Mode.SUBTRACT)

    # 草图10 → 切除-拉伸6 (cut, through all)
    with BuildSketch(Plane(origin=(0, 0, 0), x_dir=(0, 0, -1), z_dir=(1, 0, 0))):
        with BuildLine():
            Line((21.5, 8.754327867), (11.206844228, 8.394882947))
            ThreePointArc((11.206844228, 8.394882947), (3.1, 0), (11.206844228, -8.394882947))
            Line((11.206844228, -8.394882947), (21.5, -8.754327867))
            Line((21.5, -8.754327867), (21.5, 8.754327867))
        make_face()
    extrude(amount=-CUT_EXTRUDE_6_DEPTH, mode=Mode.SUBTRACT)

    # 草图24 → 凸台-拉伸2 (add)
    with BuildSketch(Plane(origin=(0, 0, 0), x_dir=(0, 0, -1), z_dir=(1, 0, 0)).offset(EXTRUDE_START_7)):
        with BuildLine():
            ThreePointArc((11.206844228, -8.394882947), (3.1, 0), (11.206844228, 8.394882947))
            Line((11.206844228, 8.394882947), (19, 8.667025943))
            Line((19, 8.667025943), (19, 10.16794026))
            Line((19, 10.16794026), (11.154494983, 9.893969187))
            ThreePointArc((11.154494983, 9.893969187), (1.6, 0), (11.154494983, -9.893969187))
            Line((11.154494983, -9.893969187), (19, -10.16794026))
            Line((19, -10.16794026), (19, -8.667025943))
            Line((19, -8.667025943), (11.206844228, -8.394882947))
        make_face()
    extrude(amount=-EXTRUDE_2_DEPTH)

    # 草图22 → 旋转1 (revolve)
    with BuildSketch(Plane.XY.offset(-11.5)):
        Polygon((-34, 9.9), (-36.5, 9.9), (-36.5, 9.3), (-38.5, 9.3), (-38.5, 8.7), (-39.5, 8.7), (-39.5, 7.5), (-37.5, 7.5), (-37.5, 8.4), (-36.5, 8.4), (-36.5, 7.5), (-35.5, 7.5), (-35.5, 8.4), (-34, 8.4), align=None)
    revolve(axis=Axis((0, 0, -11.5), (-1, 0, 0)))

    # 草图25 → 切除-拉伸17 (cut)
    with BuildSketch(Plane.ZY.offset(39.5).offset(CUT_EXTRUDE_START_3)):
        with Locations((-17.5, 0)):
            Rectangle(SKETCH_25_W, SKETCH_25_H)
    extrude(amount=CUT_EXTRUDE_17_DEPTH, mode=Mode.SUBTRACT)

    # 圆角1
    fillet_1_edges = [part_8.edges().sort_by_distance(p)[0] for p in [
        (-34, -18.9369252, -18.15),
        (-34, 27.9, -18.15),
        (15.266406942, 27.9, -18.15),
    ]]
    fillet(fillet_1_edges, radius=FILLET_1_R)

    # 草图26 → 切除-拉伸18 (cut, through all)
    with BuildSketch(Plane(origin=(0, 0, -19), x_dir=(-1, 0, 0), z_dir=(0, 0, -1))):
        with Locations((-19, 19.5)):
            Circle(SKETCH_26_R)
        with Locations((30, 23)):
            Circle(SKETCH_26_R)
        with Locations((-9.4, -23)):
            Circle(SKETCH_26_R)
        with Locations((30, -16)):
            Circle(SKETCH_26_R)
    extrude(amount=-CUT_EXTRUDE_18_DEPTH, mode=Mode.SUBTRACT)

    # 切除-拉伸19: up to this plane
    cut_extrude_19_end = Plane(origin=(14.5, -19, -19), z_dir=(0, -0.9993908270190958, 0.03489949670250105))
    # 草图28 → 切除-拉伸19 (cut, up to the surface)
    with BuildSketch(Plane(origin=(0, -18, 0), x_dir=(1, 0, 0), z_dir=(0, 1, 0)), mode=Mode.PRIVATE) as cut_extrude_19_sk1:
        with Locations((0, 14.6)):
            Circle(SKETCH_28_R)
    cut_extrude_19_tool1 = split(extrude(cut_extrude_19_sk1.sketch, amount=-CUT_EXTRUDE_19_REACH, mode=Mode.PRIVATE), bisect_by=cut_extrude_19_end, keep=Keep.BOTH, mode=Mode.PRIVATE)
    add(cut_extrude_19_tool1.solids().sort_by_distance((0, -18, -14.6))[0], mode=Mode.SUBTRACT)


solid = part_8.part
